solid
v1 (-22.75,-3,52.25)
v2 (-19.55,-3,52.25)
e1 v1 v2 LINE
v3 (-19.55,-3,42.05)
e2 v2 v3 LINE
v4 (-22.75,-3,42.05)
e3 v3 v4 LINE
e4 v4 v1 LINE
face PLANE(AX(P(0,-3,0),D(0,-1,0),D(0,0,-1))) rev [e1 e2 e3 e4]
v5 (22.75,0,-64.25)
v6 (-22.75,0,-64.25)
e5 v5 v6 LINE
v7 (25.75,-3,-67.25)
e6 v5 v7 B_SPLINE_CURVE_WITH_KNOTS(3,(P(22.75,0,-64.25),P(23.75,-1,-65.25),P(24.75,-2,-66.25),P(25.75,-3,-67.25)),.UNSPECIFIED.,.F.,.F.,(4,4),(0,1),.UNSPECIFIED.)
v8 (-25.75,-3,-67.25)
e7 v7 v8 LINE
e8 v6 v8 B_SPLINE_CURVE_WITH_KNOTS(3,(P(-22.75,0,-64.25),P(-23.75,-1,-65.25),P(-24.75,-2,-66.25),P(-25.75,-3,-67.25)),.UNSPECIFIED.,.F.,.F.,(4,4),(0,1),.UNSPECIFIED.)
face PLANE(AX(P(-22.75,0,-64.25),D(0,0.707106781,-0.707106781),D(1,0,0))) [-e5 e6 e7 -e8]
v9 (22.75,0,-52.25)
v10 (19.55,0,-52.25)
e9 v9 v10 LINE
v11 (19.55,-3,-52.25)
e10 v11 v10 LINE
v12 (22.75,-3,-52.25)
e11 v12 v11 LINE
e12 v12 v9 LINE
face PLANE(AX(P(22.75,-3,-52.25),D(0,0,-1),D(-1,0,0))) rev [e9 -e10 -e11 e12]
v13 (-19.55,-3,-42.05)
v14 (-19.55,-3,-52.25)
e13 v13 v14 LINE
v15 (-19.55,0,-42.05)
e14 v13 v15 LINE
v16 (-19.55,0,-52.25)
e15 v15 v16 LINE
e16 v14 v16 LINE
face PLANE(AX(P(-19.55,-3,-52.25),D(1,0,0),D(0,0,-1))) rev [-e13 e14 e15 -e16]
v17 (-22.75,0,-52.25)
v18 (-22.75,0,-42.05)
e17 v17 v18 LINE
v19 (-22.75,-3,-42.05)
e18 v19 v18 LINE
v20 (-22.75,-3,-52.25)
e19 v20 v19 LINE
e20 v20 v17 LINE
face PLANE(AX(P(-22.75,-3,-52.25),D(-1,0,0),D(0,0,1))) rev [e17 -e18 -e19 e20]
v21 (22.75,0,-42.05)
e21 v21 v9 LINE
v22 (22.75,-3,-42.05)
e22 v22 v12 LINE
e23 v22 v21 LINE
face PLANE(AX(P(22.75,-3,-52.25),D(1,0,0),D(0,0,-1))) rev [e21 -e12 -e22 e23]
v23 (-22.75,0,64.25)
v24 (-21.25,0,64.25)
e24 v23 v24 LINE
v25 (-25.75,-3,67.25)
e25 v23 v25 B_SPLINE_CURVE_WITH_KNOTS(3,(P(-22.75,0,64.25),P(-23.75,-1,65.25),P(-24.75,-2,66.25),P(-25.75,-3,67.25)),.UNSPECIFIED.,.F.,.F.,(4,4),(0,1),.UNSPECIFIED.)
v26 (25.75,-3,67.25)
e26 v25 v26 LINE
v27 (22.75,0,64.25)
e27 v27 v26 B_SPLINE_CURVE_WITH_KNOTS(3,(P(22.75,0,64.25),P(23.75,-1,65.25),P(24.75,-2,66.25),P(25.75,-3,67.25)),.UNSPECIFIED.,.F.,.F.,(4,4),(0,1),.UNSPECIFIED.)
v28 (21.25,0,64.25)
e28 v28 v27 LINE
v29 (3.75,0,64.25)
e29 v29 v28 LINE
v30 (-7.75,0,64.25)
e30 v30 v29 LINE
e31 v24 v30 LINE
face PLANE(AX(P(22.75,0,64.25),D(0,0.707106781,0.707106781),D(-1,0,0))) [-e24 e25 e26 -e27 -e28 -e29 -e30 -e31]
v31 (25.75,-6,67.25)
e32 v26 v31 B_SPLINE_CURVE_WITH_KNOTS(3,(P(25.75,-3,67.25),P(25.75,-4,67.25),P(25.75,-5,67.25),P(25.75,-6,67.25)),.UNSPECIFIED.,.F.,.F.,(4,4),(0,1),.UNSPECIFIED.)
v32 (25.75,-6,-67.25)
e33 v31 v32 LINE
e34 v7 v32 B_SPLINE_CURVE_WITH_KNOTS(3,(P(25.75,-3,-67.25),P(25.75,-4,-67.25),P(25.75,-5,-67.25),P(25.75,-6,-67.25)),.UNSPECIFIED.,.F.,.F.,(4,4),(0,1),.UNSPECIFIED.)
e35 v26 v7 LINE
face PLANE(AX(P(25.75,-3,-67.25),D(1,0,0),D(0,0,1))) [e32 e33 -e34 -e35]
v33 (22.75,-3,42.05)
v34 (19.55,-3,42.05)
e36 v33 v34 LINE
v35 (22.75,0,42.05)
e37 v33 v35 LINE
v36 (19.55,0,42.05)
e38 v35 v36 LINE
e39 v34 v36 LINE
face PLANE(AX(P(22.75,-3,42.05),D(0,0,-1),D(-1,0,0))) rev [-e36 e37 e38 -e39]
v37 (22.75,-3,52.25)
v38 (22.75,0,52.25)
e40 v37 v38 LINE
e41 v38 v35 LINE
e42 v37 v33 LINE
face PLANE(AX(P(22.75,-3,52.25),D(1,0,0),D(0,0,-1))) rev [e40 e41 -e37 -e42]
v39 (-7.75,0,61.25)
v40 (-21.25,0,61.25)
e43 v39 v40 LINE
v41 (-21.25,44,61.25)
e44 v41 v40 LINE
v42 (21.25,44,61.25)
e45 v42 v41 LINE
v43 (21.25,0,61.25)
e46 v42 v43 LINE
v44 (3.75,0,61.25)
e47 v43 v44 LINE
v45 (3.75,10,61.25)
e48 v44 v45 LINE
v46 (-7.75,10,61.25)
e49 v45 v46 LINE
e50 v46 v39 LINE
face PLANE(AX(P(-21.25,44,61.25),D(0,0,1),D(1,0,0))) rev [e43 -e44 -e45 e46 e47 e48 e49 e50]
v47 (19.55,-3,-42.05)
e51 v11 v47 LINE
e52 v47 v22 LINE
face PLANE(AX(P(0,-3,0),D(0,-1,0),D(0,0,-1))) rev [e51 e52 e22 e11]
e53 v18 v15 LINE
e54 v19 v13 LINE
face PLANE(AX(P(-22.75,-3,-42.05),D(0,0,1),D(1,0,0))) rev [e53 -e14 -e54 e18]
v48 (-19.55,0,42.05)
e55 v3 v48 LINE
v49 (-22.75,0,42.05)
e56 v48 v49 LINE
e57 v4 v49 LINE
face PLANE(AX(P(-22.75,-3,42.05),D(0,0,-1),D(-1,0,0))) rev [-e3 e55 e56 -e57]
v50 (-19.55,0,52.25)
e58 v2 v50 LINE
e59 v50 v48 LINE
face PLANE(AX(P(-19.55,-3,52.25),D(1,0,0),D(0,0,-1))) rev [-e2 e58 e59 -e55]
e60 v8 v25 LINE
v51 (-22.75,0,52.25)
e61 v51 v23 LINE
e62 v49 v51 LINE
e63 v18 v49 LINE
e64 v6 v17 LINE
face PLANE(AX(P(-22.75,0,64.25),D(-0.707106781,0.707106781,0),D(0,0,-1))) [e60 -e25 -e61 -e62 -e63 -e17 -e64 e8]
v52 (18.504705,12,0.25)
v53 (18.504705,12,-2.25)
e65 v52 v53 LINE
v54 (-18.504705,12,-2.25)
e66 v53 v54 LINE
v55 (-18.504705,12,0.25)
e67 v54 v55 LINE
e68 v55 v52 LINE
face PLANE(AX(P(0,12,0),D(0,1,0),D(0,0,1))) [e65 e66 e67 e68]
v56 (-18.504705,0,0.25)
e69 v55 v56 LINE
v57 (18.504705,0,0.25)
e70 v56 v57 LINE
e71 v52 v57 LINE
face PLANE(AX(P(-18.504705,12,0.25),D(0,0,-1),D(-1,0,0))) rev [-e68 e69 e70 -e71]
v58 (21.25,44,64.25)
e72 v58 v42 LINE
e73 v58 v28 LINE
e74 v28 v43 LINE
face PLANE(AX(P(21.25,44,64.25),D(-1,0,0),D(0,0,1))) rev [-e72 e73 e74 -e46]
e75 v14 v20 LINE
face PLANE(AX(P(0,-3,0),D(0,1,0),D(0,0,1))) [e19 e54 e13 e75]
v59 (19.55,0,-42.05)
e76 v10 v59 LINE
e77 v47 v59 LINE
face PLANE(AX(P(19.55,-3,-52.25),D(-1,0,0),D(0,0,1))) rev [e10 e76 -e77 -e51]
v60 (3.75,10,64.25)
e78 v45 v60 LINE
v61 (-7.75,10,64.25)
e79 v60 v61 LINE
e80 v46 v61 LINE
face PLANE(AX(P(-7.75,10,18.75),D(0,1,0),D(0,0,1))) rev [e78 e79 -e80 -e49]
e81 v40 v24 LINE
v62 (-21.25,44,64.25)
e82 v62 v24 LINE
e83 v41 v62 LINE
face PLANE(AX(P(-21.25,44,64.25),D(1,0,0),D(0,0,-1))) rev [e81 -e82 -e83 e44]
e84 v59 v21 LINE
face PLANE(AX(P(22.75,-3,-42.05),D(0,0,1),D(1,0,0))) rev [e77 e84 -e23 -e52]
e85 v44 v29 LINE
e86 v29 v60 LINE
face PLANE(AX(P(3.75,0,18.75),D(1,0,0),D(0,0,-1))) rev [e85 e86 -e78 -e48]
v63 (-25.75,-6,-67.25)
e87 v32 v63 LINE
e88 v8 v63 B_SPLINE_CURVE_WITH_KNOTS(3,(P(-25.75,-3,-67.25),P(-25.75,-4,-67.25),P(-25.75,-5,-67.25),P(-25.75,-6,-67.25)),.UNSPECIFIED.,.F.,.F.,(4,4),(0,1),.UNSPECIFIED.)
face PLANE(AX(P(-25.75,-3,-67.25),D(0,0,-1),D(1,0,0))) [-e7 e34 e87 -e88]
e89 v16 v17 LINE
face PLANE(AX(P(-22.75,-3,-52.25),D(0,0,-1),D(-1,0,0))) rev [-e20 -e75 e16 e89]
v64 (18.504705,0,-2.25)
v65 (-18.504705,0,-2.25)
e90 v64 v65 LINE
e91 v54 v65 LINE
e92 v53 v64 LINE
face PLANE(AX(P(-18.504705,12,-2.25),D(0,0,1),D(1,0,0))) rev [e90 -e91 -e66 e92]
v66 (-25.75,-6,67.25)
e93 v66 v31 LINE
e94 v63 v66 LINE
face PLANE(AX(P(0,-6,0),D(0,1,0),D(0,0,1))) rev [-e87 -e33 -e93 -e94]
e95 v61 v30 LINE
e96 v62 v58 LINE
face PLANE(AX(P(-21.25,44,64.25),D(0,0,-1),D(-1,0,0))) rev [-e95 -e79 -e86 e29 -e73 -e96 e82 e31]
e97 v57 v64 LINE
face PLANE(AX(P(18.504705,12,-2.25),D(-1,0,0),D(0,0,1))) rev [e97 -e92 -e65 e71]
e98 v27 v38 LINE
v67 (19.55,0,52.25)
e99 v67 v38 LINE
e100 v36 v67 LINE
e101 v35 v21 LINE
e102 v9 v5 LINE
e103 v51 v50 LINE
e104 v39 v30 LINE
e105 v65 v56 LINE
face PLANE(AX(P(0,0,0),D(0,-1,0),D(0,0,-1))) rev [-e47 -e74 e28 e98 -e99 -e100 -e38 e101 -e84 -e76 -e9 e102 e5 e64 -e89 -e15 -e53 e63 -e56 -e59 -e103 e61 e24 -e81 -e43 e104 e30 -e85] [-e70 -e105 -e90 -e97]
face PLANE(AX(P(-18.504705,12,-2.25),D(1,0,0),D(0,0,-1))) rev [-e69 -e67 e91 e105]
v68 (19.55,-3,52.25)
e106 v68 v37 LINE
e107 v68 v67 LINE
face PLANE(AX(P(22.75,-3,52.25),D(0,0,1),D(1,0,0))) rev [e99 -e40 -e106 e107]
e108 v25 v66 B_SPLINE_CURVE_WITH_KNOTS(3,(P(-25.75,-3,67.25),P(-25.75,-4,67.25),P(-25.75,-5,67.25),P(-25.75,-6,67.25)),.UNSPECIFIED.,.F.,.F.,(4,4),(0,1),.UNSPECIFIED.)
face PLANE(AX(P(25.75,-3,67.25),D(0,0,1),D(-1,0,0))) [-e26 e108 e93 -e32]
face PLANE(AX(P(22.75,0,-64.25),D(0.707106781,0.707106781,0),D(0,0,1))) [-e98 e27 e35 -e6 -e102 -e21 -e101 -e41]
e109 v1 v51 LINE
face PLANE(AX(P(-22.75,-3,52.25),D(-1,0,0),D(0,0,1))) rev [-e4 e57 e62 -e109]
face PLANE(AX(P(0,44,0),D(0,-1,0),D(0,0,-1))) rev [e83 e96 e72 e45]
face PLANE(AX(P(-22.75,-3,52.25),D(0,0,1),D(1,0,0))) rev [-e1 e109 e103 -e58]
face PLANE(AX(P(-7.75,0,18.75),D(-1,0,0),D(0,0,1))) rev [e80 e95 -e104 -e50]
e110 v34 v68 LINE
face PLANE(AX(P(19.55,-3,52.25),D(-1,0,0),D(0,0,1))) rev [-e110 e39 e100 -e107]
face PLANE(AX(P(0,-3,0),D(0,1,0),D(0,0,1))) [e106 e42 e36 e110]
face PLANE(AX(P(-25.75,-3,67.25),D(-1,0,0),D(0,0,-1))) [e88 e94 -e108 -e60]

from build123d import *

# Parameters (mm, degrees)
LOFT1_OUTLINE_W     = 45.5
LOFT1_OUTLINE_H     = 128.5
LOFT1_DEPTH         = 3
LOFT1_DRAFT         = 45
LOFT2_START         = -6
LOFT2_OUTLINE_W     = 51.5
LOFT2_OUTLINE_H     = 134.5
LOFT2_DEPTH         = 3
SKETCH4_W           = 42.5
SKETCH4_H           = 3
BOSS_EXTRUDE1_DEPTH = 44
SKETCH5_W           = 11.5
SKETCH5_H           = 10
CUT_EXTRUDE1_DEPTH  = 45.5
SKETCH6_W           = 37.00940911
SKETCH6_H           = 2.5
BOSS_EXTRUDE2_DEPTH = 12
SKETCH7_W           = 3.2
SKETCH7_H           = 10.2
CUT_EXTRUDE2_DEPTH  = 3


# Read off the part's stored shape, not the designer's step: Loft1, Loft2
with BuildPart() as part:
    # Loft1 outline → Loft1 (with draft: the straight prism first)
    with BuildSketch(Plane(origin=(0, 0, 0), x_dir=(1, 0, 0), z_dir=(0, 1, 0))):
        Rectangle(LOFT1_OUTLINE_W, LOFT1_OUTLINE_H)
    extrude(amount=-LOFT1_DEPTH)
    # Loft1: the draft: its side faces are tilted about the plane it starts from
    loft1_sides = [part.faces().sort_by_distance(p)[0] for p in [
        (22.75, -1.5, 0),
        (0, -1.5, -64.25),
        (-22.75, -1.5, 0),
        (0, -1.5, 64.25),
    ]]
    draft(loft1_sides, Plane(origin=(0, 0, 0), x_dir=(1, 0, 0), z_dir=(0, 1, 0)), LOFT1_DRAFT)

    # Loft2 outline → Loft2 (add)
    with BuildSketch(Plane(origin=(0, 0, 0), x_dir=(1, 0, 0), z_dir=(0, 1, 0)).offset(LOFT2_START)):
        Rectangle(LOFT2_OUTLINE_W, LOFT2_OUTLINE_H)
    extrude(amount=LOFT2_DEPTH)

    # Sketch4 → Boss-Extrude1 (add)
    with BuildSketch(Plane(origin=(0, 0, 0), x_dir=(1, 0, 0), z_dir=(0, 1, 0))):
        with Locations((0, -62.75)):
            Rectangle(SKETCH4_W, SKETCH4_H)
    extrude(amount=BOSS_EXTRUDE1_DEPTH)

    # Sketch5 → Cut-Extrude1 (cut)
    with BuildSketch(Plane.XY.offset(64.25)):
        with Locations((-2, 5)):
            Rectangle(SKETCH5_W, SKETCH5_H)
    extrude(amount=-CUT_EXTRUDE1_DEPTH, mode=Mode.SUBTRACT)

    # Sketch6 → Boss-Extrude2 (add)
    with BuildSketch(Plane(origin=(0, 0, 0), x_dir=(1, 0, 0), z_dir=(0, 1, 0))):
        with Locations((0, 1)):
            Rectangle(SKETCH6_W, SKETCH6_H)
    extrude(amount=BOSS_EXTRUDE2_DEPTH)

    # Sketch7 → Cut-Extrude2 (cut)
    with BuildSketch(Plane(origin=(0, 0, 0), x_dir=(1, 0, 0), z_dir=(0, 1, 0))):
        with Locations((-21.15, 47.15)):
            Rectangle(SKETCH7_W, SKETCH7_H)
        with Locations((21.15, 47.15)):
            Rectangle(SKETCH7_W, SKETCH7_H)
        with Locations((-21.15, -47.15)):
            Rectangle(SKETCH7_W, SKETCH7_H)
        with Locations((21.15, -47.15)):
            Rectangle(SKETCH7_W, SKETCH7_H)
    extrude(amount=-CUT_EXTRUDE2_DEPTH, mode=Mode.SUBTRACT)


solid = part.part
